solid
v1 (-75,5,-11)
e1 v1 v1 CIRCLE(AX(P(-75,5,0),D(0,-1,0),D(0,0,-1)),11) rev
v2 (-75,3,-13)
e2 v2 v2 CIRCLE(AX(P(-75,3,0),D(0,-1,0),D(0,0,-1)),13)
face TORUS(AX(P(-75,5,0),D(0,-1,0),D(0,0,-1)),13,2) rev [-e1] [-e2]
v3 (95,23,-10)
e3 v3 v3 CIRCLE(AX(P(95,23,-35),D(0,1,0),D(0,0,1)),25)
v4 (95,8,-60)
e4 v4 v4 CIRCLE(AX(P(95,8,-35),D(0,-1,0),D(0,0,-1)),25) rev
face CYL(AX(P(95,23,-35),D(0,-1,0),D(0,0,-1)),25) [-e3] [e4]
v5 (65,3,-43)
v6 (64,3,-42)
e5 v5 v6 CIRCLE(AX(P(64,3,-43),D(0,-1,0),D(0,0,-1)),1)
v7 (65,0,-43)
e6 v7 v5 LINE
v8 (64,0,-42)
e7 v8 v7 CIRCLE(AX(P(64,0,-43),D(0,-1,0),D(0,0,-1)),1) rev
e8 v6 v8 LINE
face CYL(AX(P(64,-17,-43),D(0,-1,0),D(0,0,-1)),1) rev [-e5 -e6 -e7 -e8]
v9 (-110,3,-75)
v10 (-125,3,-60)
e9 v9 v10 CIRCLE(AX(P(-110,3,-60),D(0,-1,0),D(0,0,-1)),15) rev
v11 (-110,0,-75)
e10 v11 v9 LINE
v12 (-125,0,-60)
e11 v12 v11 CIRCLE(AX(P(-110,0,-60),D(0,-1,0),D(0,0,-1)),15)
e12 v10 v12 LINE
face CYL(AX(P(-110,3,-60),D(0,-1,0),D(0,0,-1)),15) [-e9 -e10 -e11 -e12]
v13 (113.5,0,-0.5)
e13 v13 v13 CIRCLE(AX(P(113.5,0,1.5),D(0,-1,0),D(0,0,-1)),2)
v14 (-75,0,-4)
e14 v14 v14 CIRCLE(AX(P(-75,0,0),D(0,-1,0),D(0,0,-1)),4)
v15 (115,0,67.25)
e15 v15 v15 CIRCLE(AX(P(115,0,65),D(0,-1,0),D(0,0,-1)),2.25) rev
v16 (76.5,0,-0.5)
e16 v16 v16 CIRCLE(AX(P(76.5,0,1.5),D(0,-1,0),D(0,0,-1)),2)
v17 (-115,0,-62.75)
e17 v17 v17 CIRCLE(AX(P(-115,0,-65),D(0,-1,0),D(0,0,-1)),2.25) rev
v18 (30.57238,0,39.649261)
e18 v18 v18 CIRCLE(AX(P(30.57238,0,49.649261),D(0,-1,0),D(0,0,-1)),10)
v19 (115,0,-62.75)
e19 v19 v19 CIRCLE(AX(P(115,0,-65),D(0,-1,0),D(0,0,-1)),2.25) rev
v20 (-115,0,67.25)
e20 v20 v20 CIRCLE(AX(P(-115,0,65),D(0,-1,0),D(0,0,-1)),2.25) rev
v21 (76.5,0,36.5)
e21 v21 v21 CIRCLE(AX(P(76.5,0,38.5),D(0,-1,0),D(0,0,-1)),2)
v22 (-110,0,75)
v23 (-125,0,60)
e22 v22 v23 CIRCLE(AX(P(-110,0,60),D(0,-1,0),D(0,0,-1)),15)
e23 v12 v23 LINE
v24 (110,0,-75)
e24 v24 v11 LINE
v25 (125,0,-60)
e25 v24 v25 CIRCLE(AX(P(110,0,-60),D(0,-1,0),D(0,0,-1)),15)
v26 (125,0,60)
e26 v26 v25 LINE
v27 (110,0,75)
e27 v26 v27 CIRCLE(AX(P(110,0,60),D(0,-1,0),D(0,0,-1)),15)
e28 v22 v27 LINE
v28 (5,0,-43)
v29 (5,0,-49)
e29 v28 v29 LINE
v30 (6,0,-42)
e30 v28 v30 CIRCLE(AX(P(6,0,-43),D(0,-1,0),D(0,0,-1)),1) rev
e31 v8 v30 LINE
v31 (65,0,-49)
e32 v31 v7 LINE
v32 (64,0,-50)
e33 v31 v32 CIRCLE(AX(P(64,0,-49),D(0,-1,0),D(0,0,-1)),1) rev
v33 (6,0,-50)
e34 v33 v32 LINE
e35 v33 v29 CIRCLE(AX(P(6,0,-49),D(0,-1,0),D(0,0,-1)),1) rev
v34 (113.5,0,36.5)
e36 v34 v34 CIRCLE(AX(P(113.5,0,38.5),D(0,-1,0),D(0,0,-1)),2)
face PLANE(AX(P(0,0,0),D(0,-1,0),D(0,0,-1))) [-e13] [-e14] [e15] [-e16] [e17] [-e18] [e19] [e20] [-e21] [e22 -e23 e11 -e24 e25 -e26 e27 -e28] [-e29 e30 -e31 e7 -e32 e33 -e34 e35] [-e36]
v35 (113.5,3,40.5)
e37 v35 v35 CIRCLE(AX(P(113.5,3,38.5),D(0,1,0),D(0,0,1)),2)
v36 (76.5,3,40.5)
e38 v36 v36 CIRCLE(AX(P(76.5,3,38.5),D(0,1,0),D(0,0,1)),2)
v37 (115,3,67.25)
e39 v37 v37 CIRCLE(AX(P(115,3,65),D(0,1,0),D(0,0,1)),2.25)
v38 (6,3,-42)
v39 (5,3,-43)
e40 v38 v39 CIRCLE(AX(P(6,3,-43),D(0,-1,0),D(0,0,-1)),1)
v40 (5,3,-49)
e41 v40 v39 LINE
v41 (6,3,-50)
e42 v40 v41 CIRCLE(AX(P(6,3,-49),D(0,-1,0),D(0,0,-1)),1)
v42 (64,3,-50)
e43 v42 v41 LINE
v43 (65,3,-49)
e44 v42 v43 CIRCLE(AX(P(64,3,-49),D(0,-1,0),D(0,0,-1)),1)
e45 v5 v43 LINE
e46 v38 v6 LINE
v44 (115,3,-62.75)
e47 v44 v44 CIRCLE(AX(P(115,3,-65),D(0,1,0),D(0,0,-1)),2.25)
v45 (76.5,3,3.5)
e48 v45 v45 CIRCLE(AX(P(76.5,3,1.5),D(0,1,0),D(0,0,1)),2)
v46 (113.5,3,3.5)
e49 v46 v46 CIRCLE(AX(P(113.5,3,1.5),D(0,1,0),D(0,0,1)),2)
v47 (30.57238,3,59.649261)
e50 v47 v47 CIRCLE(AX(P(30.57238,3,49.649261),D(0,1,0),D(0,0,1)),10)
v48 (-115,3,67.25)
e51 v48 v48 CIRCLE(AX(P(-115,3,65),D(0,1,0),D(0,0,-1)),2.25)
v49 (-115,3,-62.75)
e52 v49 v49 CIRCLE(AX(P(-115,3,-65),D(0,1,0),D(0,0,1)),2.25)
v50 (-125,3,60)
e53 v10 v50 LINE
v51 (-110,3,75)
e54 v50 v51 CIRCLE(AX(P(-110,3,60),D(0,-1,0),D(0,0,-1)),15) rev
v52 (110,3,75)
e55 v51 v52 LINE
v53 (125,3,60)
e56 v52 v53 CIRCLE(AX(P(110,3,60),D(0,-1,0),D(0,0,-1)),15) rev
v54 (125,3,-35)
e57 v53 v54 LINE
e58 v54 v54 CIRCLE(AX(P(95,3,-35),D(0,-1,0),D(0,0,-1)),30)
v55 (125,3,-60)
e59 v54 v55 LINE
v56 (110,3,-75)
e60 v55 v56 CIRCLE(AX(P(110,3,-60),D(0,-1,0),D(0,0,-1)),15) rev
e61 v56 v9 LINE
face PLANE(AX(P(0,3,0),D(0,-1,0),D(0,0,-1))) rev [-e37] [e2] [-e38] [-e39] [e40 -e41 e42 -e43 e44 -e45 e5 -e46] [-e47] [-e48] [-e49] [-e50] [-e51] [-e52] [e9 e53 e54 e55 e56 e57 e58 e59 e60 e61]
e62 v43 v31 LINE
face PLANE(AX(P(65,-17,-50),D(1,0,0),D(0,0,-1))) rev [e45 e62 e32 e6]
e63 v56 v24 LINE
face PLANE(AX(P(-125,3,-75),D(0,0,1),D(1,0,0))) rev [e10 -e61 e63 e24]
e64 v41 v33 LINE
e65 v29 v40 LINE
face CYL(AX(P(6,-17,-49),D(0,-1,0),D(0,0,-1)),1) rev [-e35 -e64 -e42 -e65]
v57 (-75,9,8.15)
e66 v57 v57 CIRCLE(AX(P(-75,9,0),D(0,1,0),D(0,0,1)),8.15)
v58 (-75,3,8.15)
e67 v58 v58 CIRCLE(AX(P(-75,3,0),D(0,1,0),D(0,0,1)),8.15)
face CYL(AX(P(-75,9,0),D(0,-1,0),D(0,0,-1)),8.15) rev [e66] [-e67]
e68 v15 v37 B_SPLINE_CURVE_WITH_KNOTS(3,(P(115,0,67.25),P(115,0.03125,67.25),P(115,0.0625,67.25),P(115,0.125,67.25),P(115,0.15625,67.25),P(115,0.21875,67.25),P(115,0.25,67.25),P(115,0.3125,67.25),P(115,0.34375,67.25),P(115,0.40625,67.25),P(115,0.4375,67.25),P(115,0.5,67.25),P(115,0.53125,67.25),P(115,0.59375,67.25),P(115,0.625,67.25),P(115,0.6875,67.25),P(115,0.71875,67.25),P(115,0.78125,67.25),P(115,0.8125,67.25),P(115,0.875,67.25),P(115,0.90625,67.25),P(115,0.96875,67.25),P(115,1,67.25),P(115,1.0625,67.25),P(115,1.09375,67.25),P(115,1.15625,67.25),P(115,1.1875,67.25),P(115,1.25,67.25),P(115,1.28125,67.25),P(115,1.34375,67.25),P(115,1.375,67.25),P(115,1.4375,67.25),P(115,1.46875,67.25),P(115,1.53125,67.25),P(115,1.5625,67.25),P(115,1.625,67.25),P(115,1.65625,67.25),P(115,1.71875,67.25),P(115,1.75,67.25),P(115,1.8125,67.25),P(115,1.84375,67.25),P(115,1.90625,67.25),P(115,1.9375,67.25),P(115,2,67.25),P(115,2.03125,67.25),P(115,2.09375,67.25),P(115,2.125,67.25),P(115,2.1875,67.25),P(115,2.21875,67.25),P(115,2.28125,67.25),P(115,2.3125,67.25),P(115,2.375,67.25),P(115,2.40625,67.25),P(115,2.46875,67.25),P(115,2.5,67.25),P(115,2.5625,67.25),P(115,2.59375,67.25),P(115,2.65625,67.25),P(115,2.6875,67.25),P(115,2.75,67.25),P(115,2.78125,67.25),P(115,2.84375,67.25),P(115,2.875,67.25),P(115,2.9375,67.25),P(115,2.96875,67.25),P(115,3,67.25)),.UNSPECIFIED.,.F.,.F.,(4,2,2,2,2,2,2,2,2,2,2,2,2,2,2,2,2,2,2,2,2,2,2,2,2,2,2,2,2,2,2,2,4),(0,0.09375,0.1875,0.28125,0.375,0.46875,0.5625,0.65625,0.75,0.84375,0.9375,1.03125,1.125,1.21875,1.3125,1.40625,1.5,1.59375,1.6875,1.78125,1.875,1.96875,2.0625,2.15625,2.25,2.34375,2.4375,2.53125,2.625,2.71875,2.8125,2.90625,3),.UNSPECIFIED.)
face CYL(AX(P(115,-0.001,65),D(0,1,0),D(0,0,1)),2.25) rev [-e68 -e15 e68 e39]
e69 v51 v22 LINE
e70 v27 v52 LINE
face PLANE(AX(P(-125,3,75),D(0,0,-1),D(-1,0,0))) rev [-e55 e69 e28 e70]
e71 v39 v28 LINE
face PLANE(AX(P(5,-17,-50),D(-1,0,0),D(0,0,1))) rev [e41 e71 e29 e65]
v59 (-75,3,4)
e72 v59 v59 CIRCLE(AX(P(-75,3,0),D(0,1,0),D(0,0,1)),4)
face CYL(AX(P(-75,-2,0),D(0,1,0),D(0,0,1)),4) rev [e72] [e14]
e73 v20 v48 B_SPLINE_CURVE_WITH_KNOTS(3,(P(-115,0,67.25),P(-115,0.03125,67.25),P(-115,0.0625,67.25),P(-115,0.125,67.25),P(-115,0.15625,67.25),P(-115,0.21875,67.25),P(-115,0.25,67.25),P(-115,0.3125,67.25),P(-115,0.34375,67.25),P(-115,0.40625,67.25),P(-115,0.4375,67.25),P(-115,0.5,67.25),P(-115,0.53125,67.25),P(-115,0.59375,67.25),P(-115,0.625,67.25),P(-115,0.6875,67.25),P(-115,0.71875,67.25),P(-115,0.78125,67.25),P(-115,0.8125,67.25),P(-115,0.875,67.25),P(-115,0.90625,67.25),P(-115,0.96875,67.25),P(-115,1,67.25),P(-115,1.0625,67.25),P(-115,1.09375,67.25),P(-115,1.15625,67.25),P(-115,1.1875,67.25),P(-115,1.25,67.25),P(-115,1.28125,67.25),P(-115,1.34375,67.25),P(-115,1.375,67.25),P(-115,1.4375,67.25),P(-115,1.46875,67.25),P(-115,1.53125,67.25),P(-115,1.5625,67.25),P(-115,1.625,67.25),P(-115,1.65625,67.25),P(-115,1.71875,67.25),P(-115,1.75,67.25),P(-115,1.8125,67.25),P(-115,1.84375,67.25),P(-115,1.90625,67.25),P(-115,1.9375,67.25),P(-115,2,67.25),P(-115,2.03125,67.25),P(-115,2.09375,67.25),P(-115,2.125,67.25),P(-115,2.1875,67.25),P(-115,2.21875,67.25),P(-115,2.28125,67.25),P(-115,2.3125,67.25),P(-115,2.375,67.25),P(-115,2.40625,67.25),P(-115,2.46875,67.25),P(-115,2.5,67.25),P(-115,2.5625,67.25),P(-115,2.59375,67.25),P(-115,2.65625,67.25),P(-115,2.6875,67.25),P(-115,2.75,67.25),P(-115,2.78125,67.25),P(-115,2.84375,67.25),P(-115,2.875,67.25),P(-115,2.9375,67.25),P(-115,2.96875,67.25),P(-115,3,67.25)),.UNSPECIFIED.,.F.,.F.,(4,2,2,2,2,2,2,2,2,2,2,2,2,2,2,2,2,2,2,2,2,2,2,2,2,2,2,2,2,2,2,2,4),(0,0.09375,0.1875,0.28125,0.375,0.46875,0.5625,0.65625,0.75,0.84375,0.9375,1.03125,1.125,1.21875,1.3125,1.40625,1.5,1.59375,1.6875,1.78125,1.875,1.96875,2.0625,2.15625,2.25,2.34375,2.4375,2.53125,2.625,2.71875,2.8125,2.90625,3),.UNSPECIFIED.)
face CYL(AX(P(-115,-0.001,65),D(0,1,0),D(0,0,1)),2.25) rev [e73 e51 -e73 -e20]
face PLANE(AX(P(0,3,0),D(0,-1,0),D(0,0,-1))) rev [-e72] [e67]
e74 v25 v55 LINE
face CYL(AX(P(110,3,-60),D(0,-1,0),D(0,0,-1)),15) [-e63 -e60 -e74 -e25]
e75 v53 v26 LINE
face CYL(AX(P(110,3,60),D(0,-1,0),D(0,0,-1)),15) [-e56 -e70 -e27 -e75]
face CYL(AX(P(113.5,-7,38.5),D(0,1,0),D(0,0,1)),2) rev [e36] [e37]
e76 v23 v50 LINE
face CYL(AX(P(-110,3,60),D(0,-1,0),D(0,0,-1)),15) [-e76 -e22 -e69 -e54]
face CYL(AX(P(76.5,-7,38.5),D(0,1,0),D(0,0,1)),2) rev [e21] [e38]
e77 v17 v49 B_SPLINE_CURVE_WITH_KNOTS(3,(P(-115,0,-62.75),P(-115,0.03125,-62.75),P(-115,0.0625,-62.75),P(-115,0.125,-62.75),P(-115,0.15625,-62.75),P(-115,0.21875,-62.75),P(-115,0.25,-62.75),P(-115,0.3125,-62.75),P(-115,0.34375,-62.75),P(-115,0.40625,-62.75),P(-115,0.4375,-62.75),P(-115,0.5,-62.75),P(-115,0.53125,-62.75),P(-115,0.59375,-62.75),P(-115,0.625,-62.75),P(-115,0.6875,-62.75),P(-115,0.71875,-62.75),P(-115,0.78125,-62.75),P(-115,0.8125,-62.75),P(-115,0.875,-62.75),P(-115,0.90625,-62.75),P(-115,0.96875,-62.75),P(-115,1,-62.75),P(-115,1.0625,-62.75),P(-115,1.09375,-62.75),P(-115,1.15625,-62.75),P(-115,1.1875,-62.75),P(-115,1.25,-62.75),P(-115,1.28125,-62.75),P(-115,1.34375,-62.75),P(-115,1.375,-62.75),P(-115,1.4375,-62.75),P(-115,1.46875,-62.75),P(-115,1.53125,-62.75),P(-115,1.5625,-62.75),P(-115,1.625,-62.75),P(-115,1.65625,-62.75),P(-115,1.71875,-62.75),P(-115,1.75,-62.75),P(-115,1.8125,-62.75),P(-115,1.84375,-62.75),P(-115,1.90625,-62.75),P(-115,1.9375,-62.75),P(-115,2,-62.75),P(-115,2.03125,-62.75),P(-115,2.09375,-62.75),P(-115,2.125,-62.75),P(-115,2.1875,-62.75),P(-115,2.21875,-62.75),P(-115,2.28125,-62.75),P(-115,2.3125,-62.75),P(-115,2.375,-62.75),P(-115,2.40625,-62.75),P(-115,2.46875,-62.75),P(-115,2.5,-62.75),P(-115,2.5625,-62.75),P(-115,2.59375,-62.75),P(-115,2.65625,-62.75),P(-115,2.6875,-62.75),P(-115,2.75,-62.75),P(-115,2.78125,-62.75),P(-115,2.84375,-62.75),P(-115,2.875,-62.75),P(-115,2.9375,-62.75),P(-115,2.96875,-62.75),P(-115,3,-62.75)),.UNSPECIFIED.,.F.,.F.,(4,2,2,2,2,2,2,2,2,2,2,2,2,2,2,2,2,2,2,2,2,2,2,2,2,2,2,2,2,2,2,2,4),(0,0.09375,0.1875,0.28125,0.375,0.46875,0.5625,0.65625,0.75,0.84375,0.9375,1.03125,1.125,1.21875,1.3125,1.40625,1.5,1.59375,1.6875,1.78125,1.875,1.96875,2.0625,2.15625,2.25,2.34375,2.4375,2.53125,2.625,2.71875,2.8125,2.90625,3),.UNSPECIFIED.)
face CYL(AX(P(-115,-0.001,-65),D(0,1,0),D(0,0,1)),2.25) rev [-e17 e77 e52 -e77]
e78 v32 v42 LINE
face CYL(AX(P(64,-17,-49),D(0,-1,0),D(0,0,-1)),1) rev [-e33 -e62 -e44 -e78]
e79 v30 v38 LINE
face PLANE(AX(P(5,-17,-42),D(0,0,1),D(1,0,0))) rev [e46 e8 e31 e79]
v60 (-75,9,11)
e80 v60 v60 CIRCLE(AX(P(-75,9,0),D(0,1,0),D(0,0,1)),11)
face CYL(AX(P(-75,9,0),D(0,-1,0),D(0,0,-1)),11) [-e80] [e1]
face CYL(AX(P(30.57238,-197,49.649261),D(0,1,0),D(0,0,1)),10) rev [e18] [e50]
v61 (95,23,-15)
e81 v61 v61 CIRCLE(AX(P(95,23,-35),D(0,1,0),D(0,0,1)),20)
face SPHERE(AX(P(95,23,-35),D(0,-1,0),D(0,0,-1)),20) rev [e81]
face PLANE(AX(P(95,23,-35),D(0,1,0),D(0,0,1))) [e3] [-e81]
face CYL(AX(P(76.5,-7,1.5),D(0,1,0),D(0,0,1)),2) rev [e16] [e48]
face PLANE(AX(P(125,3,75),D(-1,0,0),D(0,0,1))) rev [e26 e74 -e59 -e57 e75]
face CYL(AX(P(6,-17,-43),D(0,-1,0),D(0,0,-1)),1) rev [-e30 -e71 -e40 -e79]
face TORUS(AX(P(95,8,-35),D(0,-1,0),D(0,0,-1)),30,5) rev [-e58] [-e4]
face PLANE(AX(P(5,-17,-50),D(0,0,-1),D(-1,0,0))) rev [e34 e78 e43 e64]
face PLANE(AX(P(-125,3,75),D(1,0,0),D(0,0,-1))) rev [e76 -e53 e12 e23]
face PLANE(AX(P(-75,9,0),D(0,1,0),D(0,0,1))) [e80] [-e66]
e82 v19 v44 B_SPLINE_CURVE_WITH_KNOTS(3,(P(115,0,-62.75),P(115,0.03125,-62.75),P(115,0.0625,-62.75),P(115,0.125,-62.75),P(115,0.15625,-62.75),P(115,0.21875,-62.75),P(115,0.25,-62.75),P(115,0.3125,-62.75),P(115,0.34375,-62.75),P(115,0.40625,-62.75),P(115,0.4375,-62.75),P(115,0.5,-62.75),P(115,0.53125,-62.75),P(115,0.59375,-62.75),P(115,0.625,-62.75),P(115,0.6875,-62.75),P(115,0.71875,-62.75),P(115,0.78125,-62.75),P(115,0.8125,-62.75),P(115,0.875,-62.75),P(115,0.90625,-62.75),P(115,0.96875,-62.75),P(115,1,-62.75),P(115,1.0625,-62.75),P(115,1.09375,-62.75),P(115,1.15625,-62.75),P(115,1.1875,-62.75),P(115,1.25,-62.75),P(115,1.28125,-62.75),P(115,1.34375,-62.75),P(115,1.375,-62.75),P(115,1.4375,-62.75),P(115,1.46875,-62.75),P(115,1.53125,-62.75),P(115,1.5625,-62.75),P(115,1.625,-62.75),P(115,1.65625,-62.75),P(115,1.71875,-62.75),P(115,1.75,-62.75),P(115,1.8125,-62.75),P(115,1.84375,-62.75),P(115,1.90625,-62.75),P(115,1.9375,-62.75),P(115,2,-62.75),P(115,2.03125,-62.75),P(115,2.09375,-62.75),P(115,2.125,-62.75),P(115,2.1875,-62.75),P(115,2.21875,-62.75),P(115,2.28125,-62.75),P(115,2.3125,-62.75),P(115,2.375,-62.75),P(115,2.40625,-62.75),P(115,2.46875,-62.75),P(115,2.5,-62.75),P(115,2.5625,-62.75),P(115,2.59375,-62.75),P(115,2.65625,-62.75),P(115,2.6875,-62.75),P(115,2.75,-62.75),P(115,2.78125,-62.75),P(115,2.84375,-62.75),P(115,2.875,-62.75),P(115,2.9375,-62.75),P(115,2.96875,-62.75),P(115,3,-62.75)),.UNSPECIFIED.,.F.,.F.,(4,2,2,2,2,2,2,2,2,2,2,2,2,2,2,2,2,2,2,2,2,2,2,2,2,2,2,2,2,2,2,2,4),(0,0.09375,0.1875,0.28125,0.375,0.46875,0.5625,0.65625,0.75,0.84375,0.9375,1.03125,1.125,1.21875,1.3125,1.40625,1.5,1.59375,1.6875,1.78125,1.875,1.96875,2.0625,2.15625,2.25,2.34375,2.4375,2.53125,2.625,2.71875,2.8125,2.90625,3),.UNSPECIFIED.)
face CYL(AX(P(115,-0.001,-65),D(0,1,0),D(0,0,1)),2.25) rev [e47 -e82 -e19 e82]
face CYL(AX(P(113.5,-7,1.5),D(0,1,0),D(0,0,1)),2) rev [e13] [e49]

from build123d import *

# Parameters (mm, degrees)
CROQUIS1_W              = 250
CROQUIS1_H              = 150
SALIENTE_EXTRUIR1_DEPTH = 3
REDONDEO1_R             = 15
CORTAR_EXTRUIR1_REACH   = 147.805
CROQUIS2_R              = 2.25
CROQUIS3_R              = 4
CORTAR_EXTRUIR2_DEPTH   = 5
CROQUIS4_R              = 11
CROQUIS4_R_2            = 8.15
SALIENTE_EXTRUIR2_DEPTH = 6
REDONDEO2_R             = 2
CROQUIS5_R              = 25
CROQUIS5_R_2            = 20
SALIENTE_EXTRUIR3_DEPTH = 20
REDONDEO3_R             = 20
REDONDEO4_R             = 5
CROQUIS11_W             = 60
CROQUIS11_H             = 8
CORTAR_EXTRUIR6_DEPTH   = 20
REDONDEO7_R             = 1
CROQUIS12_R             = 10
CORTAR_EXTRUIR7_DEPTH   = 200
CROQUIS6_R              = 2
CORTAR_EXTRUIR8_DEPTH   = 10


with BuildPart() as part:
    # Croquis1 → Saliente-Extruir1 (new body)
    with BuildSketch(Plane(origin=(0, 0, 0), x_dir=(1, 0, 0), z_dir=(0, 1, 0))):
        Rectangle(CROQUIS1_W, CROQUIS1_H)
    extrude(amount=SALIENTE_EXTRUIR1_DEPTH)

    # Redondeo1
    redondeo1_edges = [part.edges().sort_by_distance(p)[0] for p in [
        (125, 1.5, 75),
        (-125, 1.5, 75),
        (-125, 1.5, -75),
        (125, 1.5, -75),
    ]]
    fillet(redondeo1_edges, radius=REDONDEO1_R)

    # Croquis2 → Cortar-Extruir1 (cut, up to next)
    with BuildSketch(Plane(origin=(0, 3, 0), x_dir=(1, 0, 0), z_dir=(0, 1, 0)), mode=Mode.PRIVATE) as cortar_extruir1_sk1:
        with Locations(Location((-115, 65, 0), (0, 0, 270))):
            Circle(CROQUIS2_R)
    cortar_extruir1_tool1 = extrude(cortar_extruir1_sk1.sketch, amount=-CORTAR_EXTRUIR1_REACH, mode=Mode.PRIVATE) & part.part
    # Croquis2 → Cortar-Extruir1 (cut, up to next)
    with BuildSketch(Plane(origin=(0, 3, 0), x_dir=(1, 0, 0), z_dir=(0, 1, 0)), mode=Mode.PRIVATE) as cortar_extruir1_sk2:
        with Locations(Location((115, 65, 0), (0, 0, 270))):
            Circle(CROQUIS2_R)
    cortar_extruir1_tool2 = extrude(cortar_extruir1_sk2.sketch, amount=-CORTAR_EXTRUIR1_REACH, mode=Mode.PRIVATE) & part.part
    # Croquis2 → Cortar-Extruir1 (cut, up to next)
    with BuildSketch(Plane(origin=(0, 3, 0), x_dir=(1, 0, 0), z_dir=(0, 1, 0)), mode=Mode.PRIVATE) as cortar_extruir1_sk3:
        with Locations(Location((115, -65, 0), (0, 0, 270))):
            Circle(CROQUIS2_R)
    cortar_extruir1_tool3 = extrude(cortar_extruir1_sk3.sketch, amount=-CORTAR_EXTRUIR1_REACH, mode=Mode.PRIVATE) & part.part
    # Croquis2 → Cortar-Extruir1 (cut, up to next)
    with BuildSketch(Plane(origin=(0, 3, 0), x_dir=(1, 0, 0), z_dir=(0, 1, 0)), mode=Mode.PRIVATE) as cortar_extruir1_sk4:
        with Locations(Location((-115, -65, 0), (0, 0, 270))):
            Circle(CROQUIS2_R)
    cortar_extruir1_tool4 = extrude(cortar_extruir1_sk4.sketch, amount=-CORTAR_EXTRUIR1_REACH, mode=Mode.PRIVATE) & part.part
    add(cortar_extruir1_tool1.solids().sort_by_distance((-115, 3, -65))[0], mode=Mode.SUBTRACT)
    add(cortar_extruir1_tool2.solids().sort_by_distance((115, 3, -65))[0], mode=Mode.SUBTRACT)
    add(cortar_extruir1_tool3.solids().sort_by_distance((115, 3, 65))[0], mode=Mode.SUBTRACT)
    add(cortar_extruir1_tool4.solids().sort_by_distance((-115, 3, 65))[0], mode=Mode.SUBTRACT)

    # Croquis3 → Cortar-Extruir2 (cut)
    with BuildSketch(Plane(origin=(0, 3, 0), x_dir=(1, 0, 0), z_dir=(0, 1, 0))):
        with Locations(Location((-75, 0, 0), (0, 0, 270))):
            Circle(CROQUIS3_R)
    extrude(amount=-CORTAR_EXTRUIR2_DEPTH, mode=Mode.SUBTRACT)

    # Croquis4 → Saliente-Extruir2 (add)
    with BuildSketch(Plane(origin=(0, 3, 0), x_dir=(1, 0, 0), z_dir=(0, 1, 0))):
        with Locations(Location((-75, 0, 0), (0, 0, 90))):
            Circle(CROQUIS4_R)
        with Locations(Location((-75, 0, 0), (0, 0, 270))):
            Circle(CROQUIS4_R_2, mode=Mode.SUBTRACT)
    extrude(amount=SALIENTE_EXTRUIR2_DEPTH)

    # Redondeo2
    redondeo2_edges = [part.edges().sort_by_distance(p)[0] for p in [
        (-75, 3, 11),
    ]]
    fillet(redondeo2_edges, radius=REDONDEO2_R)

    # Croquis5 → Saliente-Extruir3 (add)
    with BuildSketch(Plane(origin=(0, 3, 0), x_dir=(1, 0, 0), z_dir=(0, 1, 0))):
        with Locations(Location((95, 35, 0), (0, 0, 90))):
            Circle(CROQUIS5_R)
        with Locations(Location((95, 35, 0), (0, 0, 270))):
            Circle(CROQUIS5_R_2, mode=Mode.SUBTRACT)
    extrude(amount=SALIENTE_EXTRUIR3_DEPTH)

    # Redondeo3
    redondeo3_edges = [part.edges().sort_by_distance(p)[0] for p in [
        (95, 3, -55),
    ]]
    fillet(redondeo3_edges, radius=REDONDEO3_R - 0.0001)  # a hair under: the kernel refuses the full size

    # Redondeo4
    redondeo4_edges = [part.edges().sort_by_distance(p)[0] for p in [
        (95, 3, -10),
    ]]
    fillet(redondeo4_edges, radius=REDONDEO4_R - 0.0001)  # a hair under: the kernel refuses the full size

    # Croquis11 → Cortar-Extruir6 (cut)
    with BuildSketch(Plane(origin=(0, 3, 0), x_dir=(1, 0, 0), z_dir=(0, 1, 0))):
        with Locations((35, 46)):
            Rectangle(CROQUIS11_W, CROQUIS11_H)
    extrude(amount=-CORTAR_EXTRUIR6_DEPTH, mode=Mode.SUBTRACT)

    # Redondeo7
    redondeo7_edges = [part.edges().sort_by_distance(p)[0] for p in [
        (5, 1.5, -42),
        (5, 1.5, -50),
        (65, 1.5, -50),
        (65, 1.5, -42),
    ]]
    fillet(redondeo7_edges, radius=REDONDEO7_R)

    # Croquis12 → Cortar-Extruir7 (cut)
    with BuildSketch(Plane(origin=(0, 3, 0), x_dir=(1, 0, 0), z_dir=(0, 1, 0))):
        with Locations(Location((30.572379794, -49.649260846, 0), (0, 0, 270))):
            Circle(CROQUIS12_R)
    extrude(amount=-CORTAR_EXTRUIR7_DEPTH, mode=Mode.SUBTRACT)

    # Croquis6 → Cortar-Extruir8 (cut)
    with BuildSketch(Plane(origin=(0, 3, 0), x_dir=(1, 0, 0), z_dir=(0, 1, 0))):
        with Locations(Location((113.5, -1.5, 0), (0, 0, 270))):
            Circle(CROQUIS6_R)
        with Locations(Location((113.5, -38.5, 0), (0, 0, 270))):
            Circle(CROQUIS6_R)
        with Locations(Location((76.5, -38.5, 0), (0, 0, 270))):
            Circle(CROQUIS6_R)
        with Locations(Location((76.5, -1.5, 0), (0, 0, 270))):
            Circle(CROQUIS6_R)
    extrude(amount=-CORTAR_EXTRUIR8_DEPTH, mode=Mode.SUBTRACT)


solid = part.part
